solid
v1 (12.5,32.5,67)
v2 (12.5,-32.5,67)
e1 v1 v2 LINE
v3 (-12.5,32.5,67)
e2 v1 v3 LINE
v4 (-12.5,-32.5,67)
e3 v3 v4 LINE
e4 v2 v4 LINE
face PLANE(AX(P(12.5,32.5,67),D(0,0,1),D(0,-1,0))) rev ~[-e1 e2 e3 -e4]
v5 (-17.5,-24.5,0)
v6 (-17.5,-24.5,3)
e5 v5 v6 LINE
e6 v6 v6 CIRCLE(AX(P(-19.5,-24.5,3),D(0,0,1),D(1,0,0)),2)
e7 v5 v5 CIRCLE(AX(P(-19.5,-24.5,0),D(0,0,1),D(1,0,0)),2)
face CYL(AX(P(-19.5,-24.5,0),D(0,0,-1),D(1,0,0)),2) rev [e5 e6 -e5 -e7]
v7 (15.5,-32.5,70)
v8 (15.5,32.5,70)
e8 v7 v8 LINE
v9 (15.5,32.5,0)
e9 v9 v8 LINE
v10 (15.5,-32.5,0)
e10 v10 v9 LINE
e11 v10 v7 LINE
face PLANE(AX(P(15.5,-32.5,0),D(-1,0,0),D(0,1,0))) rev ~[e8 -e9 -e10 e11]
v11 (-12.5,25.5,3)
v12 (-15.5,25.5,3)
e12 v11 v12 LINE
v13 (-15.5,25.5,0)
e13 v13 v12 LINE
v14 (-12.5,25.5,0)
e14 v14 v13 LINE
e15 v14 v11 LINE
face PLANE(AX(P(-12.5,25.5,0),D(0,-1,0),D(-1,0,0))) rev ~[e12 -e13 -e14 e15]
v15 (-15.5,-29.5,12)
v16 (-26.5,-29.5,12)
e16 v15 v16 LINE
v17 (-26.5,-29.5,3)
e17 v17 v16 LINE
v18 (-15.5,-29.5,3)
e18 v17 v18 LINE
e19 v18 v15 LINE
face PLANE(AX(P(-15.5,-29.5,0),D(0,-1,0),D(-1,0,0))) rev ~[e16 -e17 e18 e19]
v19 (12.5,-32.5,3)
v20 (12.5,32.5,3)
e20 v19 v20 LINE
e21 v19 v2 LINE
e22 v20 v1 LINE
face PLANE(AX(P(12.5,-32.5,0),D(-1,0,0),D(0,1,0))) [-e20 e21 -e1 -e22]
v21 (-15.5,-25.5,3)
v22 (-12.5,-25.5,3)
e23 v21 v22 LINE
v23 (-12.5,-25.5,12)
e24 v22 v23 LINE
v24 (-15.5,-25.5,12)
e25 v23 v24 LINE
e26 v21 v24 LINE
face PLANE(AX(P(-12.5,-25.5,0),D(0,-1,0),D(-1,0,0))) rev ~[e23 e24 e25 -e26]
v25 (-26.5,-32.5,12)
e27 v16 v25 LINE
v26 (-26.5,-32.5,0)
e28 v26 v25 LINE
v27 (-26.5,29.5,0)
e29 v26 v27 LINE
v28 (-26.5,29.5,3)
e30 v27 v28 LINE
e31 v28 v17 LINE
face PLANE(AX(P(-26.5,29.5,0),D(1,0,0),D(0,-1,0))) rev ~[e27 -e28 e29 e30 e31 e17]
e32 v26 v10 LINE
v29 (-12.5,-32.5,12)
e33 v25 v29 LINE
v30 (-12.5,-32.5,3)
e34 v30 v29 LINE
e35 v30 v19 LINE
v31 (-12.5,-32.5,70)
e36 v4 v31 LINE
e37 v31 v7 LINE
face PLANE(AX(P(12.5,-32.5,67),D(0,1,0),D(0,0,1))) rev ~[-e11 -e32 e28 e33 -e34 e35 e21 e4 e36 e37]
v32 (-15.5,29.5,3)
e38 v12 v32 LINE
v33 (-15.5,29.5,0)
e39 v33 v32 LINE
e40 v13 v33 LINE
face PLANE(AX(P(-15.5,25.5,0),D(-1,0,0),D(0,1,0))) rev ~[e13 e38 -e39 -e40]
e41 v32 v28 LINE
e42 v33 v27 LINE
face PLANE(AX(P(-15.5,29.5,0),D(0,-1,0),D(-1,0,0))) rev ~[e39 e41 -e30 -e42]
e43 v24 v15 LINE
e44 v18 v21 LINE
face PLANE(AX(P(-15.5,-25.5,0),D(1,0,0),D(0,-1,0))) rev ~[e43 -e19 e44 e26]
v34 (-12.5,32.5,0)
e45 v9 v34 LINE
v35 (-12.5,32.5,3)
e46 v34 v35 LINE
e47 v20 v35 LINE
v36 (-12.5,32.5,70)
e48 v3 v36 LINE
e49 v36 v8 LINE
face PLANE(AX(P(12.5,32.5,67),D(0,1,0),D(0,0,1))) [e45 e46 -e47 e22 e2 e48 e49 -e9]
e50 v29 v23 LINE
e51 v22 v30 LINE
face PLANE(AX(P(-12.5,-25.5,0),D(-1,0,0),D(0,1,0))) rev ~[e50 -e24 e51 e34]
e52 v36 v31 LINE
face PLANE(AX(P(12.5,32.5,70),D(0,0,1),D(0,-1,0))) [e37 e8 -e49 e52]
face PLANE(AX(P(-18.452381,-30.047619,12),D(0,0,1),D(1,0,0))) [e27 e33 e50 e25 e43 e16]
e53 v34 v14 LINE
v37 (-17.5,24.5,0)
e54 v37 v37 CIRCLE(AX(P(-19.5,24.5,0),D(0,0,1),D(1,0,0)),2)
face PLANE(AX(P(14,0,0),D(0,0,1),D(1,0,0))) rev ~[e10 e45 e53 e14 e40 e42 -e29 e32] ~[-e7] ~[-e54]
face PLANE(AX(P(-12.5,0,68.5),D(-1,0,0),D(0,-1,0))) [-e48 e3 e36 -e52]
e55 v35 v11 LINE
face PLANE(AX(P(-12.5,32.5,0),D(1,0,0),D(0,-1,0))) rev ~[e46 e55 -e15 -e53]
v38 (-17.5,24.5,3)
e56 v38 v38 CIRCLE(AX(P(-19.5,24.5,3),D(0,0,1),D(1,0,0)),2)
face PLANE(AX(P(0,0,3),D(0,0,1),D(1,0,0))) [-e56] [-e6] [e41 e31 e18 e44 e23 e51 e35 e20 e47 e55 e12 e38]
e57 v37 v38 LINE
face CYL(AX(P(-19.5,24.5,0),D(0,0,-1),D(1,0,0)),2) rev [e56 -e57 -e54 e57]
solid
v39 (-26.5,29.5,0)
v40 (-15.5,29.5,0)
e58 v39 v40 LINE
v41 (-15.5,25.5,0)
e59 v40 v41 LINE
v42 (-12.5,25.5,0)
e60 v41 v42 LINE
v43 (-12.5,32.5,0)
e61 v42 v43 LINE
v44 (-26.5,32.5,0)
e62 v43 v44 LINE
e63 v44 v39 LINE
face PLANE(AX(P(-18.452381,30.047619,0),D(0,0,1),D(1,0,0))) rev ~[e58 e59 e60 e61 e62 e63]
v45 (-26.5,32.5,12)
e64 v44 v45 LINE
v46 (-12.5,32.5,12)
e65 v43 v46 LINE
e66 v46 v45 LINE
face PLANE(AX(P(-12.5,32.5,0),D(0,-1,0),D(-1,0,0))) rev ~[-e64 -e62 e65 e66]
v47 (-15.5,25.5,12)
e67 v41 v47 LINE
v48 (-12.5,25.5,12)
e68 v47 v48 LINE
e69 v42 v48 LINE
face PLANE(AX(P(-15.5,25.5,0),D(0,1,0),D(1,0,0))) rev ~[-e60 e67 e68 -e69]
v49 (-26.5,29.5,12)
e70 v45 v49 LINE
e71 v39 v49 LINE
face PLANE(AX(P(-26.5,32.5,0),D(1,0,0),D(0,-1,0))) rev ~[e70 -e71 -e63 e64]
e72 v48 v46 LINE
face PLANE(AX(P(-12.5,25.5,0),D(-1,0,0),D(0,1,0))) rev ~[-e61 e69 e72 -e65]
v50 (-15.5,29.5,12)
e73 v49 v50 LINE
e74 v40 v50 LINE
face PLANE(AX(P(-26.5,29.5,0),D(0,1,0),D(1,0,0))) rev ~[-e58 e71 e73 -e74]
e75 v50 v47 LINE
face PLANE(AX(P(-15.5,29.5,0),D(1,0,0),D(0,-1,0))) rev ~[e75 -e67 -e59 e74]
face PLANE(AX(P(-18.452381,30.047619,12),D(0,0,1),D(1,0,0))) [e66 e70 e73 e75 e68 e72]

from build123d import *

# Parameters (mm, degrees)
F1_DEPTH = 12
F0_R     = 2
F2_DEPTH = 3
F3_DEPTH = 3
F0_W     = 3
F0_H     = 65
F4_DEPTH = 70
F5_W     = 65
F5_H     = 3
F6_DEPTH = 25


with BuildPart() as f1:
    # F0 (on Top) → F1 (new body)
    with BuildSketch(Plane.XY):
        Polygon((-12.5, 25.5), (-12.5, 32.5), (-26.5, 32.5), (-26.5, 29.5), (-15.5, 29.5), (-15.5, 25.5), align=None)
    extrude(amount=F1_DEPTH)


with BuildPart() as f1b:
    # F0 (on Top) → F1, piece 2 (new body)
    with BuildSketch(Plane.XY):
        Polygon((-12.5, -32.5), (-12.5, -25.5), (-15.5, -25.5), (-15.5, -29.5), (-26.5, -29.5), (-26.5, -32.5), align=None)
    extrude(amount=F1_DEPTH)

    # F0 (on Top) → F2 (join)
    with BuildSketch(Plane.XY):
        Polygon((-12.5, -25.5), (-12.5, 25.5), (-15.5, 25.5), (-15.5, 29.5), (-26.5, 29.5), (-26.5, -29.5), (-15.5, -29.5), (-15.5, -25.5), align=None)
        with Locations((-19.5, -24.5)):
            Circle(F0_R, mode=Mode.SUBTRACT)
        with Locations((-19.5, 24.5)):
            Circle(F0_R, mode=Mode.SUBTRACT)
    extrude(amount=F2_DEPTH)

    # F0 (on Top) → F3 (join)
    with BuildSketch(Plane.XY):
        Polygon((12.5, 32.5), (-12.5, 32.5), (-12.5, 25.5), (-12.5, -25.5), (-12.5, -32.5), (12.5, -32.5), align=None)
    extrude(amount=F3_DEPTH)

    # F0 (on Top) → F4 (join)
    with BuildSketch(Plane.XY):
        with Locations((14, 0)):
            Rectangle(F0_W, F0_H)
    extrude(amount=F4_DEPTH)

    # F5 (on face) → F6 (join)
    with BuildSketch(Plane(origin=(12.5, 0, 0), x_dir=(0, -1, 0), z_dir=(-1, 0, 0))):
        with Locations((0, 68.5)):
            Rectangle(F5_W, F5_H)
    extrude(amount=F6_DEPTH)


solid = Compound([f1.part, f1b.part])
